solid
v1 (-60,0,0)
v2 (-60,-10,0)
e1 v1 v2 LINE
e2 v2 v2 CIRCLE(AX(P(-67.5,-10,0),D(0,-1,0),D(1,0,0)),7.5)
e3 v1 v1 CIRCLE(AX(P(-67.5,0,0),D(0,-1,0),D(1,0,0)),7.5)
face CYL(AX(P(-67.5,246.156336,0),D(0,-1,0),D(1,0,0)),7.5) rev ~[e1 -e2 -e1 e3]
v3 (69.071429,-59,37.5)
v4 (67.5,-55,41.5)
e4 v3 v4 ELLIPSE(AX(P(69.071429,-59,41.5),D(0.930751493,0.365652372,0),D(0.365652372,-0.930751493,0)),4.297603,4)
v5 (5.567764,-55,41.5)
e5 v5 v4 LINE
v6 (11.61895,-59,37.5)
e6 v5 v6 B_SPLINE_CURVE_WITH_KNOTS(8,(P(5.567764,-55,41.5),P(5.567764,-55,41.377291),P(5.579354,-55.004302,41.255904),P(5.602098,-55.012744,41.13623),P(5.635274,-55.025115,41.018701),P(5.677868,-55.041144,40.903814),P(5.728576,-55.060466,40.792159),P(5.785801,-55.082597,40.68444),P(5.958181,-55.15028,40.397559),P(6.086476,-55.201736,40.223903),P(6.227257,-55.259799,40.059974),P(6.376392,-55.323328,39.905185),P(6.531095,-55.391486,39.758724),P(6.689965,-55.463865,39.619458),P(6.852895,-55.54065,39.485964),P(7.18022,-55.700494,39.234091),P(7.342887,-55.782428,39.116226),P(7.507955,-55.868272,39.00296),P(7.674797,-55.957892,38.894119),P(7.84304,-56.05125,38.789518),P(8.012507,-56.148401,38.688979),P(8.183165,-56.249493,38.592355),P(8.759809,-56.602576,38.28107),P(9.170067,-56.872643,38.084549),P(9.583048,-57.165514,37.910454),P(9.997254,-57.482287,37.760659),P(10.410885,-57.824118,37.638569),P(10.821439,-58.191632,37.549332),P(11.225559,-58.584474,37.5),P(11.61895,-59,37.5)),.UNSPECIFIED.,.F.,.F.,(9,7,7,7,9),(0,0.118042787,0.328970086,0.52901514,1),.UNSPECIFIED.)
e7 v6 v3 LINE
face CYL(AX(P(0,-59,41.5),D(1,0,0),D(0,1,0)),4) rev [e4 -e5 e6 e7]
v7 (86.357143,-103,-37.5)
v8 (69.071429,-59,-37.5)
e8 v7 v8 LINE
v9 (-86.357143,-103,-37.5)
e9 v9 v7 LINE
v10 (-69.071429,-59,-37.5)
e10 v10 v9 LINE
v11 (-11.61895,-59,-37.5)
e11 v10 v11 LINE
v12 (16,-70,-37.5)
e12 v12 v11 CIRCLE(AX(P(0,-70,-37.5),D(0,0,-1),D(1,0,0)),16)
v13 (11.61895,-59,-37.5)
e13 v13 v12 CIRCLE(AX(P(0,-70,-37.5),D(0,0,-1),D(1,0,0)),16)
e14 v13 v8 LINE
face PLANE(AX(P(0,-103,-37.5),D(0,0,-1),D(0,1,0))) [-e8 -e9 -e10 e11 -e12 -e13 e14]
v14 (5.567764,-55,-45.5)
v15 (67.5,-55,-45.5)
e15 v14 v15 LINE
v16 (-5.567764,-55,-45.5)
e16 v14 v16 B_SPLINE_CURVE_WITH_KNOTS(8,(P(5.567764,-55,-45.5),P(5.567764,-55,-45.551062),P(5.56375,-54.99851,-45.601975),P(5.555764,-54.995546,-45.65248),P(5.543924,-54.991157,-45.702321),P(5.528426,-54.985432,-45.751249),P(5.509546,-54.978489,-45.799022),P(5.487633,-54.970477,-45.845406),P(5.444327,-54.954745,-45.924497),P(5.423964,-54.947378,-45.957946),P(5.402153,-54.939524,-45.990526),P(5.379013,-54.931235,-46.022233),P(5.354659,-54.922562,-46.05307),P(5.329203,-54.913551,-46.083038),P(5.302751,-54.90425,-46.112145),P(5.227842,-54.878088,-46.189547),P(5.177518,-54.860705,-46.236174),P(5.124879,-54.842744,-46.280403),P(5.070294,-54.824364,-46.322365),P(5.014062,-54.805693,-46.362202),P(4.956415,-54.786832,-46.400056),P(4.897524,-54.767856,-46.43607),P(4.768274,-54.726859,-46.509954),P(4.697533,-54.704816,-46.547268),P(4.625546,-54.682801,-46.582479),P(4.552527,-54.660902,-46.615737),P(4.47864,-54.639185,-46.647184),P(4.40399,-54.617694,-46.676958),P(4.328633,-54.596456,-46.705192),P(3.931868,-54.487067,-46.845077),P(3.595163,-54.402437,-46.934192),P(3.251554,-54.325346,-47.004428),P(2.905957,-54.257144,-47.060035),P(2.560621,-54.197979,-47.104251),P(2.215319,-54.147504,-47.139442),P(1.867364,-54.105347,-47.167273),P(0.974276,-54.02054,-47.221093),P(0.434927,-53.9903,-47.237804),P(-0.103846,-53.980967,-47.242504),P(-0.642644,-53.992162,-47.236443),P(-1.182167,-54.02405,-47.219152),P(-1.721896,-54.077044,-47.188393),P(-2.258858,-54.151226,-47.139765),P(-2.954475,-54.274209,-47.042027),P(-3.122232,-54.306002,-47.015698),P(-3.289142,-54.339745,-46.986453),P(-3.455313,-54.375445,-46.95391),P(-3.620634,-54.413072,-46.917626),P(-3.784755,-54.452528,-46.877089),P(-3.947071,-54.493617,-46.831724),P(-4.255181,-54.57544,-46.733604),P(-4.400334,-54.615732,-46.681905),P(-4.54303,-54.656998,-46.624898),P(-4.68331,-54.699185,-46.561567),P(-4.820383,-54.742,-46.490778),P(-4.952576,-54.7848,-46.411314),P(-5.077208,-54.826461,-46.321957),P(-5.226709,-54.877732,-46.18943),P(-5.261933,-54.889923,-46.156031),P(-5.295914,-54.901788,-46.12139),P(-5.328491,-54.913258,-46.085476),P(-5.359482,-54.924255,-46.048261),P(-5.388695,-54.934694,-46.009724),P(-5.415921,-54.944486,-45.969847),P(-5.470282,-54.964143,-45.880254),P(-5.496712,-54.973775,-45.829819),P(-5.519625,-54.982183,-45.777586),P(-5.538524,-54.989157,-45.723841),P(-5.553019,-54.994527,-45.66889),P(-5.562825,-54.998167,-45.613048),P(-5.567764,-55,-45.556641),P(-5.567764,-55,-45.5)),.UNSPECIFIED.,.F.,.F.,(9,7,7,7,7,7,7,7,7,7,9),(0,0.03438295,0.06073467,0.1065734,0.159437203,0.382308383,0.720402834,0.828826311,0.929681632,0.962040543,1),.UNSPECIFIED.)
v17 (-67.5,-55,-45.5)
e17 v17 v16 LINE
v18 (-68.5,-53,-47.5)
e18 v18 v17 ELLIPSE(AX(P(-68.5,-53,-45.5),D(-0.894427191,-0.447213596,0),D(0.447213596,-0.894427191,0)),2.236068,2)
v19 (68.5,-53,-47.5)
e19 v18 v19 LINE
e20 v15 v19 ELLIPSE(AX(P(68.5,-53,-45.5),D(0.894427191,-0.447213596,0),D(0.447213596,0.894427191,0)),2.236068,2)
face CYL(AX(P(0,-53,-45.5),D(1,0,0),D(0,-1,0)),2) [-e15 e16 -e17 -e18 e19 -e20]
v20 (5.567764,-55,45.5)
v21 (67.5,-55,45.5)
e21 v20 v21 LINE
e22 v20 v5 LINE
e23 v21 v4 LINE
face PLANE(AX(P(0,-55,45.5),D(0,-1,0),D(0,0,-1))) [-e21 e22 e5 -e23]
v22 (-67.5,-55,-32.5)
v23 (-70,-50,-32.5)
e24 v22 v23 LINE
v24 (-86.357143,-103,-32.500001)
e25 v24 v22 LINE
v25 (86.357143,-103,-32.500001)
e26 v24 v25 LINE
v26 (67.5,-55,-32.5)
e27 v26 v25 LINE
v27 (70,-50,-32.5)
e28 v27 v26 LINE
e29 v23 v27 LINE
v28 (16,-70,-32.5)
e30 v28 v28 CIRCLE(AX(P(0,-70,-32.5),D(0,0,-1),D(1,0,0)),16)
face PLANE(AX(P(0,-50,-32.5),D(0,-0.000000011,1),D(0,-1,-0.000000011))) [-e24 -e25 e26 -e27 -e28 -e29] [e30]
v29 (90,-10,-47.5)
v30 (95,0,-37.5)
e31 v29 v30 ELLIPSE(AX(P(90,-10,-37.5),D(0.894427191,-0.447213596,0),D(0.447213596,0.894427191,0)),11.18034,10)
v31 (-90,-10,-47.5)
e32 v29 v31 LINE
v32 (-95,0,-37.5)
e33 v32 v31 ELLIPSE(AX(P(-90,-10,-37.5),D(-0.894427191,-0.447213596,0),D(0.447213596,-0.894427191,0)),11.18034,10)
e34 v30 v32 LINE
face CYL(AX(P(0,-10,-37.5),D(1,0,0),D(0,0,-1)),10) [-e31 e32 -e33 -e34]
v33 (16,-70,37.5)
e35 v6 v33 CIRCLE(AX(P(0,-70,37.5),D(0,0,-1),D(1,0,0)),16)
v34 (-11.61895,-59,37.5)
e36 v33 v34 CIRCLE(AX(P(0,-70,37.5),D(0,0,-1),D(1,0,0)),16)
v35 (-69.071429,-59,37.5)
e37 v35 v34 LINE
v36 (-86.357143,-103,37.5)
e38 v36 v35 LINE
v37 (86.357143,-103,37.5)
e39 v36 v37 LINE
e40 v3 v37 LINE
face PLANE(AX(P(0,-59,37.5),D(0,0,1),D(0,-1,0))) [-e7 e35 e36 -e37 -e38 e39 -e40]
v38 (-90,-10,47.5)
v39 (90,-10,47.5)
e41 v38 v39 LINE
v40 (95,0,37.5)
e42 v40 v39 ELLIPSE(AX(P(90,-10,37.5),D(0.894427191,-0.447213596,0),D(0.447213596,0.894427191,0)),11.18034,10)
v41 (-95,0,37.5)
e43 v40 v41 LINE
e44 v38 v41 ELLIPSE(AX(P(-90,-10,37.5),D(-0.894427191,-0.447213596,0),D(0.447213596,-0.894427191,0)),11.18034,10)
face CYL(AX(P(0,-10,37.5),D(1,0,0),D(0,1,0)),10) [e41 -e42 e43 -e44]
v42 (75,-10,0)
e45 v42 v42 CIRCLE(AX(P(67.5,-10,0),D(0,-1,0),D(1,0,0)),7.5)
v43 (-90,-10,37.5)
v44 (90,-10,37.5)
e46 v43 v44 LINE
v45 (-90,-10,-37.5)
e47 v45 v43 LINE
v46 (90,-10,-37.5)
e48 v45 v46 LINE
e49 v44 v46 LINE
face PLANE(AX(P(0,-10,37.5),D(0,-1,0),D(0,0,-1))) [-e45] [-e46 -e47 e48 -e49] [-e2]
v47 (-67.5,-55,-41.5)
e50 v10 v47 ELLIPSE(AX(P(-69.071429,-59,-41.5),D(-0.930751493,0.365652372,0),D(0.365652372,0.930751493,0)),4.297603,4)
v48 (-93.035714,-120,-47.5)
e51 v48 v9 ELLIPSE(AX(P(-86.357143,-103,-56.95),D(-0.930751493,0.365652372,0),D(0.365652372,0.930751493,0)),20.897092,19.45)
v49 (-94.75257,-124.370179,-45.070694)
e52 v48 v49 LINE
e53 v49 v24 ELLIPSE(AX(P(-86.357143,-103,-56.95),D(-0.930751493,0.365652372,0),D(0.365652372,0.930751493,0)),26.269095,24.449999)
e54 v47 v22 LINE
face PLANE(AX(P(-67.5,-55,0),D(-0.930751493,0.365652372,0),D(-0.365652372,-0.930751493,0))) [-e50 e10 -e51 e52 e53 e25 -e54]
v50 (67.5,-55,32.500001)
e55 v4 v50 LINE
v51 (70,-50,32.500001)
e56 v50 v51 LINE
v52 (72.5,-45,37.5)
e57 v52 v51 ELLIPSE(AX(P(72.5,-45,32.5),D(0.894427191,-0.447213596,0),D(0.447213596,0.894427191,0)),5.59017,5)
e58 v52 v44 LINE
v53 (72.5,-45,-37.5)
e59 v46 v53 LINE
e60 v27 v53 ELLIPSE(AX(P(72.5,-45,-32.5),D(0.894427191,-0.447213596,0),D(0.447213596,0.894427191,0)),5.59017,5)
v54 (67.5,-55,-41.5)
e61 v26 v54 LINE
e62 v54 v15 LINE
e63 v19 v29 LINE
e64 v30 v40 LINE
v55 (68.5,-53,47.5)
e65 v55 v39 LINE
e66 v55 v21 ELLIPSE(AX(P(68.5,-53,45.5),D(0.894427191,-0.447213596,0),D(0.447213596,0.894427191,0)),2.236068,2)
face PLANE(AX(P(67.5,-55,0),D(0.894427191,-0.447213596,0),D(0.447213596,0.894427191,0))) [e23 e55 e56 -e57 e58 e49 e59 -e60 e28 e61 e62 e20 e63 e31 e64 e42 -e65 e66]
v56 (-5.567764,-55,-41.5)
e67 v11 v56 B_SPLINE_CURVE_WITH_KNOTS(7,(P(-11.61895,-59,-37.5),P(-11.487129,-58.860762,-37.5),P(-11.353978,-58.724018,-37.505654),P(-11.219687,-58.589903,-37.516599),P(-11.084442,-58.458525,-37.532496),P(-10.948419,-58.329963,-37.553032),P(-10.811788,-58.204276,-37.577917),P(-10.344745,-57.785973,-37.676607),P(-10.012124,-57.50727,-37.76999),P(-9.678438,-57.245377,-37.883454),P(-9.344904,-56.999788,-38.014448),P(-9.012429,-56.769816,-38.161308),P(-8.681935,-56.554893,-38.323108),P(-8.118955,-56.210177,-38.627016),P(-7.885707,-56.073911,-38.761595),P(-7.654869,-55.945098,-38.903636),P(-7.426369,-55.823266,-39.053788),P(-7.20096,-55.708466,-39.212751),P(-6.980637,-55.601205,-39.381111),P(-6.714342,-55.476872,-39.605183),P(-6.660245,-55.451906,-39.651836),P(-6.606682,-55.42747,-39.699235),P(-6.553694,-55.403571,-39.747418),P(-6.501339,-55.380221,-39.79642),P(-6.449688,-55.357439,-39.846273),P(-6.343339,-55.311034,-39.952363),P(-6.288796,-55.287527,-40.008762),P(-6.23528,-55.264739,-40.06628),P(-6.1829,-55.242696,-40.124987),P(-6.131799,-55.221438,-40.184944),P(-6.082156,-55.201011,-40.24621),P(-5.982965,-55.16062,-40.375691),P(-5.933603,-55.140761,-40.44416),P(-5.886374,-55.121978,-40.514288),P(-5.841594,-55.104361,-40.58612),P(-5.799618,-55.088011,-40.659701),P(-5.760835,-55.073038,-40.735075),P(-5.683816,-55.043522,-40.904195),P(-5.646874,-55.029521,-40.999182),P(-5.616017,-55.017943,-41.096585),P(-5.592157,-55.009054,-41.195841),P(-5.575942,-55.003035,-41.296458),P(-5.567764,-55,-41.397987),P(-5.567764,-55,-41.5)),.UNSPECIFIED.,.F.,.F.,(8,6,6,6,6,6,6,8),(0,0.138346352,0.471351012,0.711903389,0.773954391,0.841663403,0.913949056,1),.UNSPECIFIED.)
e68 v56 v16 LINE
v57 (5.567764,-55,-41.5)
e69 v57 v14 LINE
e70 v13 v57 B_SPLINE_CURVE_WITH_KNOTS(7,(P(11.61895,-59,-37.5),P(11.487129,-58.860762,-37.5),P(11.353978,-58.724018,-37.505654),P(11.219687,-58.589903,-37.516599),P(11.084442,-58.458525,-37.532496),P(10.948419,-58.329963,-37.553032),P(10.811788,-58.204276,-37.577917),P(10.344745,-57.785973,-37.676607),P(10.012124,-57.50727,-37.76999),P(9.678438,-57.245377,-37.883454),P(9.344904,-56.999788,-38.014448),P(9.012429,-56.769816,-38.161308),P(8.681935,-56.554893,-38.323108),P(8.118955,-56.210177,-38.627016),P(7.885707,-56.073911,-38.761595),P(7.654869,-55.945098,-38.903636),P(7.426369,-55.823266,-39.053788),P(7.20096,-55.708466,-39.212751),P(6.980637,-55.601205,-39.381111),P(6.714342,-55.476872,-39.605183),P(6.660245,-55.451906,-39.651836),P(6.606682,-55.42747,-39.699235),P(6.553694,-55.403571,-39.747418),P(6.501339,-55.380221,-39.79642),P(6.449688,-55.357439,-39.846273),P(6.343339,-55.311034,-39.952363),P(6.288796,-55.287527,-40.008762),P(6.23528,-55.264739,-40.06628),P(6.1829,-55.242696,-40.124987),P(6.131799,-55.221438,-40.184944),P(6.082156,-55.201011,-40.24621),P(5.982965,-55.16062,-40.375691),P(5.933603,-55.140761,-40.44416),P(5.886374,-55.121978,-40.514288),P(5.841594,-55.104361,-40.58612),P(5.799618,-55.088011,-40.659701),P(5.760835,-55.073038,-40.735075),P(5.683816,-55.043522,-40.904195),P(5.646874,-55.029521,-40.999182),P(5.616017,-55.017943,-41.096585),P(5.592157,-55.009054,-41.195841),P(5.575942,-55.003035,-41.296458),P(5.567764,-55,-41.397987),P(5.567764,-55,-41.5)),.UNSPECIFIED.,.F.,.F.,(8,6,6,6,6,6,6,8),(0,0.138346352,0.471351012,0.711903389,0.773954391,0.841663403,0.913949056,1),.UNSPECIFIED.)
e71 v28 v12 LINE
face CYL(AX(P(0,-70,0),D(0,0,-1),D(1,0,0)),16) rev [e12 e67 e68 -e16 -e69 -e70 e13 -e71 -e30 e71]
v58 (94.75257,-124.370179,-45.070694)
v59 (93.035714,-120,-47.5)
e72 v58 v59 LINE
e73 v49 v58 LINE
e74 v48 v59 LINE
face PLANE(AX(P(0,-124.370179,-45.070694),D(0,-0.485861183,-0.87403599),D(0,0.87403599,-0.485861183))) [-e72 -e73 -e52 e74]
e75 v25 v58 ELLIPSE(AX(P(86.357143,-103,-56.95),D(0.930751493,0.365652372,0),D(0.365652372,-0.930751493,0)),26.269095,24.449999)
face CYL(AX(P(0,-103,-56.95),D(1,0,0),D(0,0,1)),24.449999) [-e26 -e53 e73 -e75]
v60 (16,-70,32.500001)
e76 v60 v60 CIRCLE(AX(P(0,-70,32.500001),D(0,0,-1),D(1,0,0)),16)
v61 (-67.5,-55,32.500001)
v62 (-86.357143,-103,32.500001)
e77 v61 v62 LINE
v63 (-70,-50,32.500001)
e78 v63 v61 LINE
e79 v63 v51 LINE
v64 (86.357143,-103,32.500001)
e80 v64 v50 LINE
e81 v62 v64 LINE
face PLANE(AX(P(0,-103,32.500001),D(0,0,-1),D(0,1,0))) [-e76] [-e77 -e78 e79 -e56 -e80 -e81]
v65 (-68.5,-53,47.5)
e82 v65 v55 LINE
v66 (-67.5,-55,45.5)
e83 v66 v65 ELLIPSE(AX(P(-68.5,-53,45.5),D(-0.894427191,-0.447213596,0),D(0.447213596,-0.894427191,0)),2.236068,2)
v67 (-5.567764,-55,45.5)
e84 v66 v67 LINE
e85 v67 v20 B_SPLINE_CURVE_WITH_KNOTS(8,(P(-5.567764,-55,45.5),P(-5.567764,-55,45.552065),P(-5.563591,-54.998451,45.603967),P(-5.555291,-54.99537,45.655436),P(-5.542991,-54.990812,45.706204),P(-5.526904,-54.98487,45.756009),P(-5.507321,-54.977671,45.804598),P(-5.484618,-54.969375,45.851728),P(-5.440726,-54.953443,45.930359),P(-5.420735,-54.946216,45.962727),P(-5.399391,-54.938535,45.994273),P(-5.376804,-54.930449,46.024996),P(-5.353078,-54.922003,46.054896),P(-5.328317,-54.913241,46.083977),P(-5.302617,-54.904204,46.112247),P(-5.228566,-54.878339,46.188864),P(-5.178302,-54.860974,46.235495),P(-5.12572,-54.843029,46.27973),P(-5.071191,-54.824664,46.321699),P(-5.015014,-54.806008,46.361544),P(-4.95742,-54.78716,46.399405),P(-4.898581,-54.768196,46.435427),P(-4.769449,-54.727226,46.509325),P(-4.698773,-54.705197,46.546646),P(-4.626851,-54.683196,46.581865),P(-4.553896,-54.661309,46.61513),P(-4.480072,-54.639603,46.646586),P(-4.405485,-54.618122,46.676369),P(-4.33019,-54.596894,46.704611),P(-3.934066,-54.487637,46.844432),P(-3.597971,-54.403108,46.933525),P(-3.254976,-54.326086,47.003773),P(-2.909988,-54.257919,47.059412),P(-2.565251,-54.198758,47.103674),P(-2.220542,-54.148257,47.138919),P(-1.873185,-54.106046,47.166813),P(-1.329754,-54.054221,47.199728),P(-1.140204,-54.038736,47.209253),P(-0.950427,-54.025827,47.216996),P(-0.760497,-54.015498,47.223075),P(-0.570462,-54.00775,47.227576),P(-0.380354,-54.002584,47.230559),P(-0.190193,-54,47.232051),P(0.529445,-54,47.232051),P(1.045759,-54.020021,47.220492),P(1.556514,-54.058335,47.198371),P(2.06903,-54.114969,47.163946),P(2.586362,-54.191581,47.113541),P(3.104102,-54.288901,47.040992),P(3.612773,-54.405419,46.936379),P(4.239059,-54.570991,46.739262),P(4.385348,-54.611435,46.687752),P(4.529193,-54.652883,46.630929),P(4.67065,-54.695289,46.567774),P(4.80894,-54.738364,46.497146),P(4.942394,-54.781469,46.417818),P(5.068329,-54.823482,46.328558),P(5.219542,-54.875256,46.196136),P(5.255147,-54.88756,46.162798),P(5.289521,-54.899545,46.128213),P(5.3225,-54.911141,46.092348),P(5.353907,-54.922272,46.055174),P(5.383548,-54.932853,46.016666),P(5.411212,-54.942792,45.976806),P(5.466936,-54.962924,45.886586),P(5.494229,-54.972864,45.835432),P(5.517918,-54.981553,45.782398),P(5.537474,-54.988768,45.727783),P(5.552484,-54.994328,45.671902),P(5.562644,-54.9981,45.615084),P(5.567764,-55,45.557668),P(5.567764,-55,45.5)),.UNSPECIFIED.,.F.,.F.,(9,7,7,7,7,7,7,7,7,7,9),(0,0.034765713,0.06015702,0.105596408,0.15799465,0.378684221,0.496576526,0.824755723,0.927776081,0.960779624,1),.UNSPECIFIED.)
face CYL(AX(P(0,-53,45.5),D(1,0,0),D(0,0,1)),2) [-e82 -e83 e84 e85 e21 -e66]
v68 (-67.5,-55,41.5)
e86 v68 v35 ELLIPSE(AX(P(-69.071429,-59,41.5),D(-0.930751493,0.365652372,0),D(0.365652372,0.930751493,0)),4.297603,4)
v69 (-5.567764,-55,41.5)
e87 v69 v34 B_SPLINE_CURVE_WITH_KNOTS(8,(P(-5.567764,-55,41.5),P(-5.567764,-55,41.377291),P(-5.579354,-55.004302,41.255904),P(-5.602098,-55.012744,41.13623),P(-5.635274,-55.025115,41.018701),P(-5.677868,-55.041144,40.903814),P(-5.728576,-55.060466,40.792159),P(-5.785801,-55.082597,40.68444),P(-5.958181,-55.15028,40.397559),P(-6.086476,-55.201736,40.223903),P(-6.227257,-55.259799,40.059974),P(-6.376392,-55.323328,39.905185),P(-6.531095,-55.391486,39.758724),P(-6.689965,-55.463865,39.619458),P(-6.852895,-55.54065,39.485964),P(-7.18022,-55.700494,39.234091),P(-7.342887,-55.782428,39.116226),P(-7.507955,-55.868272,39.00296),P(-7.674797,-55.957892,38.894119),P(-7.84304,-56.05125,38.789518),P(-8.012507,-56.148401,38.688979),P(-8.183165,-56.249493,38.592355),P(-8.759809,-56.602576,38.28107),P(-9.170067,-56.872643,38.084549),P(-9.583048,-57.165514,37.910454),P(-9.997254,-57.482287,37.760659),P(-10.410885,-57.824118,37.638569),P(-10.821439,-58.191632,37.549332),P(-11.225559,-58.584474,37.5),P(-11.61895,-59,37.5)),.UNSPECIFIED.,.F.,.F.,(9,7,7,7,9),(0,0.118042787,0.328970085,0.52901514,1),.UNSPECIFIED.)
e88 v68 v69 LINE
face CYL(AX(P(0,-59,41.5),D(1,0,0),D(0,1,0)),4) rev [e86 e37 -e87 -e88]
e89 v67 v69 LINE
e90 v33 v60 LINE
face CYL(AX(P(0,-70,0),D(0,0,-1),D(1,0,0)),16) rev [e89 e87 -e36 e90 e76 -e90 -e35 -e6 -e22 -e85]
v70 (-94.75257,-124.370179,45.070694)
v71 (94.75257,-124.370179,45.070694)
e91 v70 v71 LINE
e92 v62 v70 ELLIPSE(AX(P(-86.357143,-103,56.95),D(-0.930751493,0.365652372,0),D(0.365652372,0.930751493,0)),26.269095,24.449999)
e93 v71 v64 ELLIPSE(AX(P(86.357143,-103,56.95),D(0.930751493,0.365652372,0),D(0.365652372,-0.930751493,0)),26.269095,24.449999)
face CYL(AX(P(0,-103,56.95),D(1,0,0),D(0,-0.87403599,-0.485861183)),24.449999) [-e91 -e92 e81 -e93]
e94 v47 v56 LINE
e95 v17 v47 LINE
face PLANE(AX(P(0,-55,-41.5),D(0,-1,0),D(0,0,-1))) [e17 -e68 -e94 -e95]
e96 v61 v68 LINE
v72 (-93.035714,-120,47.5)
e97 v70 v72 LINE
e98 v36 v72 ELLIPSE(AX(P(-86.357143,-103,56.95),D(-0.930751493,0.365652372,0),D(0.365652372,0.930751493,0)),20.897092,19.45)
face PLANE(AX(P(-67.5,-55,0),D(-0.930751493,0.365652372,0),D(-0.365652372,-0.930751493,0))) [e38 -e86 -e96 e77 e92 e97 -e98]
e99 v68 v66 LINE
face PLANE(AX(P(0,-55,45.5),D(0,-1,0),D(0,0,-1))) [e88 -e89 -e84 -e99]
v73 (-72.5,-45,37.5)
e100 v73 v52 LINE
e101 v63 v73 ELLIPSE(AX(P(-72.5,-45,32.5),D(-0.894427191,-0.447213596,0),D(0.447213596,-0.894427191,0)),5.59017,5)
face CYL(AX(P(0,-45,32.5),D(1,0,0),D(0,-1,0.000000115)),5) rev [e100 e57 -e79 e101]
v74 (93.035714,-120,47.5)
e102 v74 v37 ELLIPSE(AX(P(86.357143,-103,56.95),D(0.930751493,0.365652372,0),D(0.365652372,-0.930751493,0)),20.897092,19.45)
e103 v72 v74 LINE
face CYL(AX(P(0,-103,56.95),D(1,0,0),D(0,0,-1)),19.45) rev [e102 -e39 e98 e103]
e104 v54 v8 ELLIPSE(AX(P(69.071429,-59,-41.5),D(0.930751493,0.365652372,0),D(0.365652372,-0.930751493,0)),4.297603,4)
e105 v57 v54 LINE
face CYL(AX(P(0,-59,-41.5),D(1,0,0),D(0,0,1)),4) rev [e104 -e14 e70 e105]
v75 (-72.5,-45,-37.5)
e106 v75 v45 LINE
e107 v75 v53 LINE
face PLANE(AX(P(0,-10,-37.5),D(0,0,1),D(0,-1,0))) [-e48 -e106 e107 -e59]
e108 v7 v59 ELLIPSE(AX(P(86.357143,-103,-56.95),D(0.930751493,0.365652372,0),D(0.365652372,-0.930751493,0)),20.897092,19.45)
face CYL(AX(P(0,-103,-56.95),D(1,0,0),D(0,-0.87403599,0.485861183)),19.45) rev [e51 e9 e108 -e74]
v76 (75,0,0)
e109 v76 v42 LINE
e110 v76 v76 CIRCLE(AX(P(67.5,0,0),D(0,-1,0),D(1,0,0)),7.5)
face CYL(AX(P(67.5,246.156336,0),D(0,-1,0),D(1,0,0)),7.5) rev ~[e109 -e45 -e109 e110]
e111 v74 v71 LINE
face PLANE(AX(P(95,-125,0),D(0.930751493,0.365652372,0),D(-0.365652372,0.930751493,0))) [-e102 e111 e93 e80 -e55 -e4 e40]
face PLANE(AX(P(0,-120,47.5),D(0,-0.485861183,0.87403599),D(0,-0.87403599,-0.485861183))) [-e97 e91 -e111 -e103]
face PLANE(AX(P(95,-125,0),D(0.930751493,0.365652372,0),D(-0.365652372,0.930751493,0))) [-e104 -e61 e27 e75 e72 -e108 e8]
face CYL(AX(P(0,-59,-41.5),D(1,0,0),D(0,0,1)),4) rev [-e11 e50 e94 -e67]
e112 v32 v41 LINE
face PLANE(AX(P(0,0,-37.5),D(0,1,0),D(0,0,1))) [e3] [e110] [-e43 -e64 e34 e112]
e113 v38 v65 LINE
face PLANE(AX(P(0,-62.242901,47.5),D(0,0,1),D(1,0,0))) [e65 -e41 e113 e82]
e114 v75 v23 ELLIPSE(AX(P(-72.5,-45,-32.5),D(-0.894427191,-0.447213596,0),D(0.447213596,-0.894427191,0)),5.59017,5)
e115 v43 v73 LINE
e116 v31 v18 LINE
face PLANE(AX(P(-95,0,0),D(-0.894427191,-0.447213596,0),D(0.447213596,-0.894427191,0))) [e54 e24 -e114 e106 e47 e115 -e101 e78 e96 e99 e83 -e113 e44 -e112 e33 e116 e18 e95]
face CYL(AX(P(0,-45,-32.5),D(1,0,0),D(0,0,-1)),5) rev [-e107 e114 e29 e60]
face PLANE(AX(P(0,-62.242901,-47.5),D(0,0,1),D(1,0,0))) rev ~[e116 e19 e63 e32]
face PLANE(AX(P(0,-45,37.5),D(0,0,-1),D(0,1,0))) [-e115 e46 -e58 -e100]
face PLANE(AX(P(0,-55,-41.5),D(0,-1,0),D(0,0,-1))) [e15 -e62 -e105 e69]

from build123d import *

# Parameters (mm, degrees)
F0_R     = 16
F1_DEPTH = 47.5
F3_DEPTH = 95
F5_D     = 15


# Not quite as in the source:
# - ends of sketch curves that miss each other by under 0.0002 mm in the source are joined


with BuildPart() as f1:
    # F0 (on Top) → F1 (new body, symmetric)
    with BuildSketch(Plane.XY):
        Polygon((95, 0), (0, 0), (-95, 0), (-67.5, -55), (-95, -125), (0, -125), (95, -125), (67.5, -55), align=None)
        with Locations((0, -70)):
            Circle(F0_R, mode=Mode.SUBTRACT)
    extrude(amount=F1_DEPTH, both=True)

    # F2 (on Right) → F3 (intersect, symmetric)
    with BuildSketch(Plane.YZ):
        with BuildLine():
            Line((-10, 0), (0, 0))
            Line((0, 0), (0, 37.5))
            ThreePointArc((0, 37.5), (-2.9289321881, 44.5710678119), (-10, 47.5))
            Line((-10, 47.5), (-53, 47.5))
            ThreePointArc((-53, 47.5), (-54.4142135624, 46.9142135624), (-55, 45.5))
            Line((-55, 45.5), (-55, 41.5))
            ThreePointArc((-55, 41.5), (-56.1715728753, 38.6715728753), (-59, 37.5))
            Line((-59, 37.5), (-103, 37.5))
            ThreePointArc((-103, 37.5), (-112.8615414617, 40.1853795152), (-120, 47.5))
            Line((-120, 47.5), (-124.3701794471, 45.0706943661))
            ThreePointArc((-124.3701794471, 45.0706943661), (-115.3966418036, 35.8757089339), (-103, 32.5000005737))
            Line((-103, 32.5000005737), (-50, 32.5000005737))
            ThreePointArc((-50, 32.5000005737), (-48.5355339059, 36.0355339059), (-45, 37.5))
            Line((-45, 37.5), (-10, 37.5))
            Line((-10, 37.5), (-10, 0))
        make_face()
        with BuildLine():
            Line((0, -37.5), (0, 0))
            Line((0, 0), (-10, 0))
            Line((-10, 0), (-10, -37.5))
            Line((-10, -37.5), (-45, -37.5))
            ThreePointArc((-45, -37.5), (-48.5355339059, -36.0355339059), (-50, -32.5))
            Line((-50, -32.5), (-103, -32.5000005737))
            ThreePointArc((-103, -32.5000005737), (-115.3966418036, -35.8757089339), (-124.3701794471, -45.0706943661))
            Line((-124.3701794471, -45.0706943661), (-120, -47.5))
            ThreePointArc((-120, -47.5), (-112.8615414617, -40.1853795152), (-103, -37.5))
            Line((-103, -37.5), (-59, -37.5))
            ThreePointArc((-59, -37.5), (-56.1715728753, -38.6715728753), (-55, -41.5))
            Line((-55, -41.5), (-55, -45.5))
            ThreePointArc((-55, -45.5), (-54.4142135624, -46.9142135624), (-53, -47.5))
            Line((-53, -47.5), (-10, -47.5))
            ThreePointArc((-10, -47.5), (-2.9289321881, -44.5710678119), (0, -37.5))
        make_face()
    extrude(amount=F3_DEPTH, both=True, mode=Mode.INTERSECT)

    # F5 (through all)
    with Locations(Plane(origin=(0, 0, 0), x_dir=(-1, 0, 0), z_dir=(0, 1, 0))):
        with Locations((67.5, 0), (-67.5, 0)):
            Hole(F5_D / 2)


solid = f1.part
